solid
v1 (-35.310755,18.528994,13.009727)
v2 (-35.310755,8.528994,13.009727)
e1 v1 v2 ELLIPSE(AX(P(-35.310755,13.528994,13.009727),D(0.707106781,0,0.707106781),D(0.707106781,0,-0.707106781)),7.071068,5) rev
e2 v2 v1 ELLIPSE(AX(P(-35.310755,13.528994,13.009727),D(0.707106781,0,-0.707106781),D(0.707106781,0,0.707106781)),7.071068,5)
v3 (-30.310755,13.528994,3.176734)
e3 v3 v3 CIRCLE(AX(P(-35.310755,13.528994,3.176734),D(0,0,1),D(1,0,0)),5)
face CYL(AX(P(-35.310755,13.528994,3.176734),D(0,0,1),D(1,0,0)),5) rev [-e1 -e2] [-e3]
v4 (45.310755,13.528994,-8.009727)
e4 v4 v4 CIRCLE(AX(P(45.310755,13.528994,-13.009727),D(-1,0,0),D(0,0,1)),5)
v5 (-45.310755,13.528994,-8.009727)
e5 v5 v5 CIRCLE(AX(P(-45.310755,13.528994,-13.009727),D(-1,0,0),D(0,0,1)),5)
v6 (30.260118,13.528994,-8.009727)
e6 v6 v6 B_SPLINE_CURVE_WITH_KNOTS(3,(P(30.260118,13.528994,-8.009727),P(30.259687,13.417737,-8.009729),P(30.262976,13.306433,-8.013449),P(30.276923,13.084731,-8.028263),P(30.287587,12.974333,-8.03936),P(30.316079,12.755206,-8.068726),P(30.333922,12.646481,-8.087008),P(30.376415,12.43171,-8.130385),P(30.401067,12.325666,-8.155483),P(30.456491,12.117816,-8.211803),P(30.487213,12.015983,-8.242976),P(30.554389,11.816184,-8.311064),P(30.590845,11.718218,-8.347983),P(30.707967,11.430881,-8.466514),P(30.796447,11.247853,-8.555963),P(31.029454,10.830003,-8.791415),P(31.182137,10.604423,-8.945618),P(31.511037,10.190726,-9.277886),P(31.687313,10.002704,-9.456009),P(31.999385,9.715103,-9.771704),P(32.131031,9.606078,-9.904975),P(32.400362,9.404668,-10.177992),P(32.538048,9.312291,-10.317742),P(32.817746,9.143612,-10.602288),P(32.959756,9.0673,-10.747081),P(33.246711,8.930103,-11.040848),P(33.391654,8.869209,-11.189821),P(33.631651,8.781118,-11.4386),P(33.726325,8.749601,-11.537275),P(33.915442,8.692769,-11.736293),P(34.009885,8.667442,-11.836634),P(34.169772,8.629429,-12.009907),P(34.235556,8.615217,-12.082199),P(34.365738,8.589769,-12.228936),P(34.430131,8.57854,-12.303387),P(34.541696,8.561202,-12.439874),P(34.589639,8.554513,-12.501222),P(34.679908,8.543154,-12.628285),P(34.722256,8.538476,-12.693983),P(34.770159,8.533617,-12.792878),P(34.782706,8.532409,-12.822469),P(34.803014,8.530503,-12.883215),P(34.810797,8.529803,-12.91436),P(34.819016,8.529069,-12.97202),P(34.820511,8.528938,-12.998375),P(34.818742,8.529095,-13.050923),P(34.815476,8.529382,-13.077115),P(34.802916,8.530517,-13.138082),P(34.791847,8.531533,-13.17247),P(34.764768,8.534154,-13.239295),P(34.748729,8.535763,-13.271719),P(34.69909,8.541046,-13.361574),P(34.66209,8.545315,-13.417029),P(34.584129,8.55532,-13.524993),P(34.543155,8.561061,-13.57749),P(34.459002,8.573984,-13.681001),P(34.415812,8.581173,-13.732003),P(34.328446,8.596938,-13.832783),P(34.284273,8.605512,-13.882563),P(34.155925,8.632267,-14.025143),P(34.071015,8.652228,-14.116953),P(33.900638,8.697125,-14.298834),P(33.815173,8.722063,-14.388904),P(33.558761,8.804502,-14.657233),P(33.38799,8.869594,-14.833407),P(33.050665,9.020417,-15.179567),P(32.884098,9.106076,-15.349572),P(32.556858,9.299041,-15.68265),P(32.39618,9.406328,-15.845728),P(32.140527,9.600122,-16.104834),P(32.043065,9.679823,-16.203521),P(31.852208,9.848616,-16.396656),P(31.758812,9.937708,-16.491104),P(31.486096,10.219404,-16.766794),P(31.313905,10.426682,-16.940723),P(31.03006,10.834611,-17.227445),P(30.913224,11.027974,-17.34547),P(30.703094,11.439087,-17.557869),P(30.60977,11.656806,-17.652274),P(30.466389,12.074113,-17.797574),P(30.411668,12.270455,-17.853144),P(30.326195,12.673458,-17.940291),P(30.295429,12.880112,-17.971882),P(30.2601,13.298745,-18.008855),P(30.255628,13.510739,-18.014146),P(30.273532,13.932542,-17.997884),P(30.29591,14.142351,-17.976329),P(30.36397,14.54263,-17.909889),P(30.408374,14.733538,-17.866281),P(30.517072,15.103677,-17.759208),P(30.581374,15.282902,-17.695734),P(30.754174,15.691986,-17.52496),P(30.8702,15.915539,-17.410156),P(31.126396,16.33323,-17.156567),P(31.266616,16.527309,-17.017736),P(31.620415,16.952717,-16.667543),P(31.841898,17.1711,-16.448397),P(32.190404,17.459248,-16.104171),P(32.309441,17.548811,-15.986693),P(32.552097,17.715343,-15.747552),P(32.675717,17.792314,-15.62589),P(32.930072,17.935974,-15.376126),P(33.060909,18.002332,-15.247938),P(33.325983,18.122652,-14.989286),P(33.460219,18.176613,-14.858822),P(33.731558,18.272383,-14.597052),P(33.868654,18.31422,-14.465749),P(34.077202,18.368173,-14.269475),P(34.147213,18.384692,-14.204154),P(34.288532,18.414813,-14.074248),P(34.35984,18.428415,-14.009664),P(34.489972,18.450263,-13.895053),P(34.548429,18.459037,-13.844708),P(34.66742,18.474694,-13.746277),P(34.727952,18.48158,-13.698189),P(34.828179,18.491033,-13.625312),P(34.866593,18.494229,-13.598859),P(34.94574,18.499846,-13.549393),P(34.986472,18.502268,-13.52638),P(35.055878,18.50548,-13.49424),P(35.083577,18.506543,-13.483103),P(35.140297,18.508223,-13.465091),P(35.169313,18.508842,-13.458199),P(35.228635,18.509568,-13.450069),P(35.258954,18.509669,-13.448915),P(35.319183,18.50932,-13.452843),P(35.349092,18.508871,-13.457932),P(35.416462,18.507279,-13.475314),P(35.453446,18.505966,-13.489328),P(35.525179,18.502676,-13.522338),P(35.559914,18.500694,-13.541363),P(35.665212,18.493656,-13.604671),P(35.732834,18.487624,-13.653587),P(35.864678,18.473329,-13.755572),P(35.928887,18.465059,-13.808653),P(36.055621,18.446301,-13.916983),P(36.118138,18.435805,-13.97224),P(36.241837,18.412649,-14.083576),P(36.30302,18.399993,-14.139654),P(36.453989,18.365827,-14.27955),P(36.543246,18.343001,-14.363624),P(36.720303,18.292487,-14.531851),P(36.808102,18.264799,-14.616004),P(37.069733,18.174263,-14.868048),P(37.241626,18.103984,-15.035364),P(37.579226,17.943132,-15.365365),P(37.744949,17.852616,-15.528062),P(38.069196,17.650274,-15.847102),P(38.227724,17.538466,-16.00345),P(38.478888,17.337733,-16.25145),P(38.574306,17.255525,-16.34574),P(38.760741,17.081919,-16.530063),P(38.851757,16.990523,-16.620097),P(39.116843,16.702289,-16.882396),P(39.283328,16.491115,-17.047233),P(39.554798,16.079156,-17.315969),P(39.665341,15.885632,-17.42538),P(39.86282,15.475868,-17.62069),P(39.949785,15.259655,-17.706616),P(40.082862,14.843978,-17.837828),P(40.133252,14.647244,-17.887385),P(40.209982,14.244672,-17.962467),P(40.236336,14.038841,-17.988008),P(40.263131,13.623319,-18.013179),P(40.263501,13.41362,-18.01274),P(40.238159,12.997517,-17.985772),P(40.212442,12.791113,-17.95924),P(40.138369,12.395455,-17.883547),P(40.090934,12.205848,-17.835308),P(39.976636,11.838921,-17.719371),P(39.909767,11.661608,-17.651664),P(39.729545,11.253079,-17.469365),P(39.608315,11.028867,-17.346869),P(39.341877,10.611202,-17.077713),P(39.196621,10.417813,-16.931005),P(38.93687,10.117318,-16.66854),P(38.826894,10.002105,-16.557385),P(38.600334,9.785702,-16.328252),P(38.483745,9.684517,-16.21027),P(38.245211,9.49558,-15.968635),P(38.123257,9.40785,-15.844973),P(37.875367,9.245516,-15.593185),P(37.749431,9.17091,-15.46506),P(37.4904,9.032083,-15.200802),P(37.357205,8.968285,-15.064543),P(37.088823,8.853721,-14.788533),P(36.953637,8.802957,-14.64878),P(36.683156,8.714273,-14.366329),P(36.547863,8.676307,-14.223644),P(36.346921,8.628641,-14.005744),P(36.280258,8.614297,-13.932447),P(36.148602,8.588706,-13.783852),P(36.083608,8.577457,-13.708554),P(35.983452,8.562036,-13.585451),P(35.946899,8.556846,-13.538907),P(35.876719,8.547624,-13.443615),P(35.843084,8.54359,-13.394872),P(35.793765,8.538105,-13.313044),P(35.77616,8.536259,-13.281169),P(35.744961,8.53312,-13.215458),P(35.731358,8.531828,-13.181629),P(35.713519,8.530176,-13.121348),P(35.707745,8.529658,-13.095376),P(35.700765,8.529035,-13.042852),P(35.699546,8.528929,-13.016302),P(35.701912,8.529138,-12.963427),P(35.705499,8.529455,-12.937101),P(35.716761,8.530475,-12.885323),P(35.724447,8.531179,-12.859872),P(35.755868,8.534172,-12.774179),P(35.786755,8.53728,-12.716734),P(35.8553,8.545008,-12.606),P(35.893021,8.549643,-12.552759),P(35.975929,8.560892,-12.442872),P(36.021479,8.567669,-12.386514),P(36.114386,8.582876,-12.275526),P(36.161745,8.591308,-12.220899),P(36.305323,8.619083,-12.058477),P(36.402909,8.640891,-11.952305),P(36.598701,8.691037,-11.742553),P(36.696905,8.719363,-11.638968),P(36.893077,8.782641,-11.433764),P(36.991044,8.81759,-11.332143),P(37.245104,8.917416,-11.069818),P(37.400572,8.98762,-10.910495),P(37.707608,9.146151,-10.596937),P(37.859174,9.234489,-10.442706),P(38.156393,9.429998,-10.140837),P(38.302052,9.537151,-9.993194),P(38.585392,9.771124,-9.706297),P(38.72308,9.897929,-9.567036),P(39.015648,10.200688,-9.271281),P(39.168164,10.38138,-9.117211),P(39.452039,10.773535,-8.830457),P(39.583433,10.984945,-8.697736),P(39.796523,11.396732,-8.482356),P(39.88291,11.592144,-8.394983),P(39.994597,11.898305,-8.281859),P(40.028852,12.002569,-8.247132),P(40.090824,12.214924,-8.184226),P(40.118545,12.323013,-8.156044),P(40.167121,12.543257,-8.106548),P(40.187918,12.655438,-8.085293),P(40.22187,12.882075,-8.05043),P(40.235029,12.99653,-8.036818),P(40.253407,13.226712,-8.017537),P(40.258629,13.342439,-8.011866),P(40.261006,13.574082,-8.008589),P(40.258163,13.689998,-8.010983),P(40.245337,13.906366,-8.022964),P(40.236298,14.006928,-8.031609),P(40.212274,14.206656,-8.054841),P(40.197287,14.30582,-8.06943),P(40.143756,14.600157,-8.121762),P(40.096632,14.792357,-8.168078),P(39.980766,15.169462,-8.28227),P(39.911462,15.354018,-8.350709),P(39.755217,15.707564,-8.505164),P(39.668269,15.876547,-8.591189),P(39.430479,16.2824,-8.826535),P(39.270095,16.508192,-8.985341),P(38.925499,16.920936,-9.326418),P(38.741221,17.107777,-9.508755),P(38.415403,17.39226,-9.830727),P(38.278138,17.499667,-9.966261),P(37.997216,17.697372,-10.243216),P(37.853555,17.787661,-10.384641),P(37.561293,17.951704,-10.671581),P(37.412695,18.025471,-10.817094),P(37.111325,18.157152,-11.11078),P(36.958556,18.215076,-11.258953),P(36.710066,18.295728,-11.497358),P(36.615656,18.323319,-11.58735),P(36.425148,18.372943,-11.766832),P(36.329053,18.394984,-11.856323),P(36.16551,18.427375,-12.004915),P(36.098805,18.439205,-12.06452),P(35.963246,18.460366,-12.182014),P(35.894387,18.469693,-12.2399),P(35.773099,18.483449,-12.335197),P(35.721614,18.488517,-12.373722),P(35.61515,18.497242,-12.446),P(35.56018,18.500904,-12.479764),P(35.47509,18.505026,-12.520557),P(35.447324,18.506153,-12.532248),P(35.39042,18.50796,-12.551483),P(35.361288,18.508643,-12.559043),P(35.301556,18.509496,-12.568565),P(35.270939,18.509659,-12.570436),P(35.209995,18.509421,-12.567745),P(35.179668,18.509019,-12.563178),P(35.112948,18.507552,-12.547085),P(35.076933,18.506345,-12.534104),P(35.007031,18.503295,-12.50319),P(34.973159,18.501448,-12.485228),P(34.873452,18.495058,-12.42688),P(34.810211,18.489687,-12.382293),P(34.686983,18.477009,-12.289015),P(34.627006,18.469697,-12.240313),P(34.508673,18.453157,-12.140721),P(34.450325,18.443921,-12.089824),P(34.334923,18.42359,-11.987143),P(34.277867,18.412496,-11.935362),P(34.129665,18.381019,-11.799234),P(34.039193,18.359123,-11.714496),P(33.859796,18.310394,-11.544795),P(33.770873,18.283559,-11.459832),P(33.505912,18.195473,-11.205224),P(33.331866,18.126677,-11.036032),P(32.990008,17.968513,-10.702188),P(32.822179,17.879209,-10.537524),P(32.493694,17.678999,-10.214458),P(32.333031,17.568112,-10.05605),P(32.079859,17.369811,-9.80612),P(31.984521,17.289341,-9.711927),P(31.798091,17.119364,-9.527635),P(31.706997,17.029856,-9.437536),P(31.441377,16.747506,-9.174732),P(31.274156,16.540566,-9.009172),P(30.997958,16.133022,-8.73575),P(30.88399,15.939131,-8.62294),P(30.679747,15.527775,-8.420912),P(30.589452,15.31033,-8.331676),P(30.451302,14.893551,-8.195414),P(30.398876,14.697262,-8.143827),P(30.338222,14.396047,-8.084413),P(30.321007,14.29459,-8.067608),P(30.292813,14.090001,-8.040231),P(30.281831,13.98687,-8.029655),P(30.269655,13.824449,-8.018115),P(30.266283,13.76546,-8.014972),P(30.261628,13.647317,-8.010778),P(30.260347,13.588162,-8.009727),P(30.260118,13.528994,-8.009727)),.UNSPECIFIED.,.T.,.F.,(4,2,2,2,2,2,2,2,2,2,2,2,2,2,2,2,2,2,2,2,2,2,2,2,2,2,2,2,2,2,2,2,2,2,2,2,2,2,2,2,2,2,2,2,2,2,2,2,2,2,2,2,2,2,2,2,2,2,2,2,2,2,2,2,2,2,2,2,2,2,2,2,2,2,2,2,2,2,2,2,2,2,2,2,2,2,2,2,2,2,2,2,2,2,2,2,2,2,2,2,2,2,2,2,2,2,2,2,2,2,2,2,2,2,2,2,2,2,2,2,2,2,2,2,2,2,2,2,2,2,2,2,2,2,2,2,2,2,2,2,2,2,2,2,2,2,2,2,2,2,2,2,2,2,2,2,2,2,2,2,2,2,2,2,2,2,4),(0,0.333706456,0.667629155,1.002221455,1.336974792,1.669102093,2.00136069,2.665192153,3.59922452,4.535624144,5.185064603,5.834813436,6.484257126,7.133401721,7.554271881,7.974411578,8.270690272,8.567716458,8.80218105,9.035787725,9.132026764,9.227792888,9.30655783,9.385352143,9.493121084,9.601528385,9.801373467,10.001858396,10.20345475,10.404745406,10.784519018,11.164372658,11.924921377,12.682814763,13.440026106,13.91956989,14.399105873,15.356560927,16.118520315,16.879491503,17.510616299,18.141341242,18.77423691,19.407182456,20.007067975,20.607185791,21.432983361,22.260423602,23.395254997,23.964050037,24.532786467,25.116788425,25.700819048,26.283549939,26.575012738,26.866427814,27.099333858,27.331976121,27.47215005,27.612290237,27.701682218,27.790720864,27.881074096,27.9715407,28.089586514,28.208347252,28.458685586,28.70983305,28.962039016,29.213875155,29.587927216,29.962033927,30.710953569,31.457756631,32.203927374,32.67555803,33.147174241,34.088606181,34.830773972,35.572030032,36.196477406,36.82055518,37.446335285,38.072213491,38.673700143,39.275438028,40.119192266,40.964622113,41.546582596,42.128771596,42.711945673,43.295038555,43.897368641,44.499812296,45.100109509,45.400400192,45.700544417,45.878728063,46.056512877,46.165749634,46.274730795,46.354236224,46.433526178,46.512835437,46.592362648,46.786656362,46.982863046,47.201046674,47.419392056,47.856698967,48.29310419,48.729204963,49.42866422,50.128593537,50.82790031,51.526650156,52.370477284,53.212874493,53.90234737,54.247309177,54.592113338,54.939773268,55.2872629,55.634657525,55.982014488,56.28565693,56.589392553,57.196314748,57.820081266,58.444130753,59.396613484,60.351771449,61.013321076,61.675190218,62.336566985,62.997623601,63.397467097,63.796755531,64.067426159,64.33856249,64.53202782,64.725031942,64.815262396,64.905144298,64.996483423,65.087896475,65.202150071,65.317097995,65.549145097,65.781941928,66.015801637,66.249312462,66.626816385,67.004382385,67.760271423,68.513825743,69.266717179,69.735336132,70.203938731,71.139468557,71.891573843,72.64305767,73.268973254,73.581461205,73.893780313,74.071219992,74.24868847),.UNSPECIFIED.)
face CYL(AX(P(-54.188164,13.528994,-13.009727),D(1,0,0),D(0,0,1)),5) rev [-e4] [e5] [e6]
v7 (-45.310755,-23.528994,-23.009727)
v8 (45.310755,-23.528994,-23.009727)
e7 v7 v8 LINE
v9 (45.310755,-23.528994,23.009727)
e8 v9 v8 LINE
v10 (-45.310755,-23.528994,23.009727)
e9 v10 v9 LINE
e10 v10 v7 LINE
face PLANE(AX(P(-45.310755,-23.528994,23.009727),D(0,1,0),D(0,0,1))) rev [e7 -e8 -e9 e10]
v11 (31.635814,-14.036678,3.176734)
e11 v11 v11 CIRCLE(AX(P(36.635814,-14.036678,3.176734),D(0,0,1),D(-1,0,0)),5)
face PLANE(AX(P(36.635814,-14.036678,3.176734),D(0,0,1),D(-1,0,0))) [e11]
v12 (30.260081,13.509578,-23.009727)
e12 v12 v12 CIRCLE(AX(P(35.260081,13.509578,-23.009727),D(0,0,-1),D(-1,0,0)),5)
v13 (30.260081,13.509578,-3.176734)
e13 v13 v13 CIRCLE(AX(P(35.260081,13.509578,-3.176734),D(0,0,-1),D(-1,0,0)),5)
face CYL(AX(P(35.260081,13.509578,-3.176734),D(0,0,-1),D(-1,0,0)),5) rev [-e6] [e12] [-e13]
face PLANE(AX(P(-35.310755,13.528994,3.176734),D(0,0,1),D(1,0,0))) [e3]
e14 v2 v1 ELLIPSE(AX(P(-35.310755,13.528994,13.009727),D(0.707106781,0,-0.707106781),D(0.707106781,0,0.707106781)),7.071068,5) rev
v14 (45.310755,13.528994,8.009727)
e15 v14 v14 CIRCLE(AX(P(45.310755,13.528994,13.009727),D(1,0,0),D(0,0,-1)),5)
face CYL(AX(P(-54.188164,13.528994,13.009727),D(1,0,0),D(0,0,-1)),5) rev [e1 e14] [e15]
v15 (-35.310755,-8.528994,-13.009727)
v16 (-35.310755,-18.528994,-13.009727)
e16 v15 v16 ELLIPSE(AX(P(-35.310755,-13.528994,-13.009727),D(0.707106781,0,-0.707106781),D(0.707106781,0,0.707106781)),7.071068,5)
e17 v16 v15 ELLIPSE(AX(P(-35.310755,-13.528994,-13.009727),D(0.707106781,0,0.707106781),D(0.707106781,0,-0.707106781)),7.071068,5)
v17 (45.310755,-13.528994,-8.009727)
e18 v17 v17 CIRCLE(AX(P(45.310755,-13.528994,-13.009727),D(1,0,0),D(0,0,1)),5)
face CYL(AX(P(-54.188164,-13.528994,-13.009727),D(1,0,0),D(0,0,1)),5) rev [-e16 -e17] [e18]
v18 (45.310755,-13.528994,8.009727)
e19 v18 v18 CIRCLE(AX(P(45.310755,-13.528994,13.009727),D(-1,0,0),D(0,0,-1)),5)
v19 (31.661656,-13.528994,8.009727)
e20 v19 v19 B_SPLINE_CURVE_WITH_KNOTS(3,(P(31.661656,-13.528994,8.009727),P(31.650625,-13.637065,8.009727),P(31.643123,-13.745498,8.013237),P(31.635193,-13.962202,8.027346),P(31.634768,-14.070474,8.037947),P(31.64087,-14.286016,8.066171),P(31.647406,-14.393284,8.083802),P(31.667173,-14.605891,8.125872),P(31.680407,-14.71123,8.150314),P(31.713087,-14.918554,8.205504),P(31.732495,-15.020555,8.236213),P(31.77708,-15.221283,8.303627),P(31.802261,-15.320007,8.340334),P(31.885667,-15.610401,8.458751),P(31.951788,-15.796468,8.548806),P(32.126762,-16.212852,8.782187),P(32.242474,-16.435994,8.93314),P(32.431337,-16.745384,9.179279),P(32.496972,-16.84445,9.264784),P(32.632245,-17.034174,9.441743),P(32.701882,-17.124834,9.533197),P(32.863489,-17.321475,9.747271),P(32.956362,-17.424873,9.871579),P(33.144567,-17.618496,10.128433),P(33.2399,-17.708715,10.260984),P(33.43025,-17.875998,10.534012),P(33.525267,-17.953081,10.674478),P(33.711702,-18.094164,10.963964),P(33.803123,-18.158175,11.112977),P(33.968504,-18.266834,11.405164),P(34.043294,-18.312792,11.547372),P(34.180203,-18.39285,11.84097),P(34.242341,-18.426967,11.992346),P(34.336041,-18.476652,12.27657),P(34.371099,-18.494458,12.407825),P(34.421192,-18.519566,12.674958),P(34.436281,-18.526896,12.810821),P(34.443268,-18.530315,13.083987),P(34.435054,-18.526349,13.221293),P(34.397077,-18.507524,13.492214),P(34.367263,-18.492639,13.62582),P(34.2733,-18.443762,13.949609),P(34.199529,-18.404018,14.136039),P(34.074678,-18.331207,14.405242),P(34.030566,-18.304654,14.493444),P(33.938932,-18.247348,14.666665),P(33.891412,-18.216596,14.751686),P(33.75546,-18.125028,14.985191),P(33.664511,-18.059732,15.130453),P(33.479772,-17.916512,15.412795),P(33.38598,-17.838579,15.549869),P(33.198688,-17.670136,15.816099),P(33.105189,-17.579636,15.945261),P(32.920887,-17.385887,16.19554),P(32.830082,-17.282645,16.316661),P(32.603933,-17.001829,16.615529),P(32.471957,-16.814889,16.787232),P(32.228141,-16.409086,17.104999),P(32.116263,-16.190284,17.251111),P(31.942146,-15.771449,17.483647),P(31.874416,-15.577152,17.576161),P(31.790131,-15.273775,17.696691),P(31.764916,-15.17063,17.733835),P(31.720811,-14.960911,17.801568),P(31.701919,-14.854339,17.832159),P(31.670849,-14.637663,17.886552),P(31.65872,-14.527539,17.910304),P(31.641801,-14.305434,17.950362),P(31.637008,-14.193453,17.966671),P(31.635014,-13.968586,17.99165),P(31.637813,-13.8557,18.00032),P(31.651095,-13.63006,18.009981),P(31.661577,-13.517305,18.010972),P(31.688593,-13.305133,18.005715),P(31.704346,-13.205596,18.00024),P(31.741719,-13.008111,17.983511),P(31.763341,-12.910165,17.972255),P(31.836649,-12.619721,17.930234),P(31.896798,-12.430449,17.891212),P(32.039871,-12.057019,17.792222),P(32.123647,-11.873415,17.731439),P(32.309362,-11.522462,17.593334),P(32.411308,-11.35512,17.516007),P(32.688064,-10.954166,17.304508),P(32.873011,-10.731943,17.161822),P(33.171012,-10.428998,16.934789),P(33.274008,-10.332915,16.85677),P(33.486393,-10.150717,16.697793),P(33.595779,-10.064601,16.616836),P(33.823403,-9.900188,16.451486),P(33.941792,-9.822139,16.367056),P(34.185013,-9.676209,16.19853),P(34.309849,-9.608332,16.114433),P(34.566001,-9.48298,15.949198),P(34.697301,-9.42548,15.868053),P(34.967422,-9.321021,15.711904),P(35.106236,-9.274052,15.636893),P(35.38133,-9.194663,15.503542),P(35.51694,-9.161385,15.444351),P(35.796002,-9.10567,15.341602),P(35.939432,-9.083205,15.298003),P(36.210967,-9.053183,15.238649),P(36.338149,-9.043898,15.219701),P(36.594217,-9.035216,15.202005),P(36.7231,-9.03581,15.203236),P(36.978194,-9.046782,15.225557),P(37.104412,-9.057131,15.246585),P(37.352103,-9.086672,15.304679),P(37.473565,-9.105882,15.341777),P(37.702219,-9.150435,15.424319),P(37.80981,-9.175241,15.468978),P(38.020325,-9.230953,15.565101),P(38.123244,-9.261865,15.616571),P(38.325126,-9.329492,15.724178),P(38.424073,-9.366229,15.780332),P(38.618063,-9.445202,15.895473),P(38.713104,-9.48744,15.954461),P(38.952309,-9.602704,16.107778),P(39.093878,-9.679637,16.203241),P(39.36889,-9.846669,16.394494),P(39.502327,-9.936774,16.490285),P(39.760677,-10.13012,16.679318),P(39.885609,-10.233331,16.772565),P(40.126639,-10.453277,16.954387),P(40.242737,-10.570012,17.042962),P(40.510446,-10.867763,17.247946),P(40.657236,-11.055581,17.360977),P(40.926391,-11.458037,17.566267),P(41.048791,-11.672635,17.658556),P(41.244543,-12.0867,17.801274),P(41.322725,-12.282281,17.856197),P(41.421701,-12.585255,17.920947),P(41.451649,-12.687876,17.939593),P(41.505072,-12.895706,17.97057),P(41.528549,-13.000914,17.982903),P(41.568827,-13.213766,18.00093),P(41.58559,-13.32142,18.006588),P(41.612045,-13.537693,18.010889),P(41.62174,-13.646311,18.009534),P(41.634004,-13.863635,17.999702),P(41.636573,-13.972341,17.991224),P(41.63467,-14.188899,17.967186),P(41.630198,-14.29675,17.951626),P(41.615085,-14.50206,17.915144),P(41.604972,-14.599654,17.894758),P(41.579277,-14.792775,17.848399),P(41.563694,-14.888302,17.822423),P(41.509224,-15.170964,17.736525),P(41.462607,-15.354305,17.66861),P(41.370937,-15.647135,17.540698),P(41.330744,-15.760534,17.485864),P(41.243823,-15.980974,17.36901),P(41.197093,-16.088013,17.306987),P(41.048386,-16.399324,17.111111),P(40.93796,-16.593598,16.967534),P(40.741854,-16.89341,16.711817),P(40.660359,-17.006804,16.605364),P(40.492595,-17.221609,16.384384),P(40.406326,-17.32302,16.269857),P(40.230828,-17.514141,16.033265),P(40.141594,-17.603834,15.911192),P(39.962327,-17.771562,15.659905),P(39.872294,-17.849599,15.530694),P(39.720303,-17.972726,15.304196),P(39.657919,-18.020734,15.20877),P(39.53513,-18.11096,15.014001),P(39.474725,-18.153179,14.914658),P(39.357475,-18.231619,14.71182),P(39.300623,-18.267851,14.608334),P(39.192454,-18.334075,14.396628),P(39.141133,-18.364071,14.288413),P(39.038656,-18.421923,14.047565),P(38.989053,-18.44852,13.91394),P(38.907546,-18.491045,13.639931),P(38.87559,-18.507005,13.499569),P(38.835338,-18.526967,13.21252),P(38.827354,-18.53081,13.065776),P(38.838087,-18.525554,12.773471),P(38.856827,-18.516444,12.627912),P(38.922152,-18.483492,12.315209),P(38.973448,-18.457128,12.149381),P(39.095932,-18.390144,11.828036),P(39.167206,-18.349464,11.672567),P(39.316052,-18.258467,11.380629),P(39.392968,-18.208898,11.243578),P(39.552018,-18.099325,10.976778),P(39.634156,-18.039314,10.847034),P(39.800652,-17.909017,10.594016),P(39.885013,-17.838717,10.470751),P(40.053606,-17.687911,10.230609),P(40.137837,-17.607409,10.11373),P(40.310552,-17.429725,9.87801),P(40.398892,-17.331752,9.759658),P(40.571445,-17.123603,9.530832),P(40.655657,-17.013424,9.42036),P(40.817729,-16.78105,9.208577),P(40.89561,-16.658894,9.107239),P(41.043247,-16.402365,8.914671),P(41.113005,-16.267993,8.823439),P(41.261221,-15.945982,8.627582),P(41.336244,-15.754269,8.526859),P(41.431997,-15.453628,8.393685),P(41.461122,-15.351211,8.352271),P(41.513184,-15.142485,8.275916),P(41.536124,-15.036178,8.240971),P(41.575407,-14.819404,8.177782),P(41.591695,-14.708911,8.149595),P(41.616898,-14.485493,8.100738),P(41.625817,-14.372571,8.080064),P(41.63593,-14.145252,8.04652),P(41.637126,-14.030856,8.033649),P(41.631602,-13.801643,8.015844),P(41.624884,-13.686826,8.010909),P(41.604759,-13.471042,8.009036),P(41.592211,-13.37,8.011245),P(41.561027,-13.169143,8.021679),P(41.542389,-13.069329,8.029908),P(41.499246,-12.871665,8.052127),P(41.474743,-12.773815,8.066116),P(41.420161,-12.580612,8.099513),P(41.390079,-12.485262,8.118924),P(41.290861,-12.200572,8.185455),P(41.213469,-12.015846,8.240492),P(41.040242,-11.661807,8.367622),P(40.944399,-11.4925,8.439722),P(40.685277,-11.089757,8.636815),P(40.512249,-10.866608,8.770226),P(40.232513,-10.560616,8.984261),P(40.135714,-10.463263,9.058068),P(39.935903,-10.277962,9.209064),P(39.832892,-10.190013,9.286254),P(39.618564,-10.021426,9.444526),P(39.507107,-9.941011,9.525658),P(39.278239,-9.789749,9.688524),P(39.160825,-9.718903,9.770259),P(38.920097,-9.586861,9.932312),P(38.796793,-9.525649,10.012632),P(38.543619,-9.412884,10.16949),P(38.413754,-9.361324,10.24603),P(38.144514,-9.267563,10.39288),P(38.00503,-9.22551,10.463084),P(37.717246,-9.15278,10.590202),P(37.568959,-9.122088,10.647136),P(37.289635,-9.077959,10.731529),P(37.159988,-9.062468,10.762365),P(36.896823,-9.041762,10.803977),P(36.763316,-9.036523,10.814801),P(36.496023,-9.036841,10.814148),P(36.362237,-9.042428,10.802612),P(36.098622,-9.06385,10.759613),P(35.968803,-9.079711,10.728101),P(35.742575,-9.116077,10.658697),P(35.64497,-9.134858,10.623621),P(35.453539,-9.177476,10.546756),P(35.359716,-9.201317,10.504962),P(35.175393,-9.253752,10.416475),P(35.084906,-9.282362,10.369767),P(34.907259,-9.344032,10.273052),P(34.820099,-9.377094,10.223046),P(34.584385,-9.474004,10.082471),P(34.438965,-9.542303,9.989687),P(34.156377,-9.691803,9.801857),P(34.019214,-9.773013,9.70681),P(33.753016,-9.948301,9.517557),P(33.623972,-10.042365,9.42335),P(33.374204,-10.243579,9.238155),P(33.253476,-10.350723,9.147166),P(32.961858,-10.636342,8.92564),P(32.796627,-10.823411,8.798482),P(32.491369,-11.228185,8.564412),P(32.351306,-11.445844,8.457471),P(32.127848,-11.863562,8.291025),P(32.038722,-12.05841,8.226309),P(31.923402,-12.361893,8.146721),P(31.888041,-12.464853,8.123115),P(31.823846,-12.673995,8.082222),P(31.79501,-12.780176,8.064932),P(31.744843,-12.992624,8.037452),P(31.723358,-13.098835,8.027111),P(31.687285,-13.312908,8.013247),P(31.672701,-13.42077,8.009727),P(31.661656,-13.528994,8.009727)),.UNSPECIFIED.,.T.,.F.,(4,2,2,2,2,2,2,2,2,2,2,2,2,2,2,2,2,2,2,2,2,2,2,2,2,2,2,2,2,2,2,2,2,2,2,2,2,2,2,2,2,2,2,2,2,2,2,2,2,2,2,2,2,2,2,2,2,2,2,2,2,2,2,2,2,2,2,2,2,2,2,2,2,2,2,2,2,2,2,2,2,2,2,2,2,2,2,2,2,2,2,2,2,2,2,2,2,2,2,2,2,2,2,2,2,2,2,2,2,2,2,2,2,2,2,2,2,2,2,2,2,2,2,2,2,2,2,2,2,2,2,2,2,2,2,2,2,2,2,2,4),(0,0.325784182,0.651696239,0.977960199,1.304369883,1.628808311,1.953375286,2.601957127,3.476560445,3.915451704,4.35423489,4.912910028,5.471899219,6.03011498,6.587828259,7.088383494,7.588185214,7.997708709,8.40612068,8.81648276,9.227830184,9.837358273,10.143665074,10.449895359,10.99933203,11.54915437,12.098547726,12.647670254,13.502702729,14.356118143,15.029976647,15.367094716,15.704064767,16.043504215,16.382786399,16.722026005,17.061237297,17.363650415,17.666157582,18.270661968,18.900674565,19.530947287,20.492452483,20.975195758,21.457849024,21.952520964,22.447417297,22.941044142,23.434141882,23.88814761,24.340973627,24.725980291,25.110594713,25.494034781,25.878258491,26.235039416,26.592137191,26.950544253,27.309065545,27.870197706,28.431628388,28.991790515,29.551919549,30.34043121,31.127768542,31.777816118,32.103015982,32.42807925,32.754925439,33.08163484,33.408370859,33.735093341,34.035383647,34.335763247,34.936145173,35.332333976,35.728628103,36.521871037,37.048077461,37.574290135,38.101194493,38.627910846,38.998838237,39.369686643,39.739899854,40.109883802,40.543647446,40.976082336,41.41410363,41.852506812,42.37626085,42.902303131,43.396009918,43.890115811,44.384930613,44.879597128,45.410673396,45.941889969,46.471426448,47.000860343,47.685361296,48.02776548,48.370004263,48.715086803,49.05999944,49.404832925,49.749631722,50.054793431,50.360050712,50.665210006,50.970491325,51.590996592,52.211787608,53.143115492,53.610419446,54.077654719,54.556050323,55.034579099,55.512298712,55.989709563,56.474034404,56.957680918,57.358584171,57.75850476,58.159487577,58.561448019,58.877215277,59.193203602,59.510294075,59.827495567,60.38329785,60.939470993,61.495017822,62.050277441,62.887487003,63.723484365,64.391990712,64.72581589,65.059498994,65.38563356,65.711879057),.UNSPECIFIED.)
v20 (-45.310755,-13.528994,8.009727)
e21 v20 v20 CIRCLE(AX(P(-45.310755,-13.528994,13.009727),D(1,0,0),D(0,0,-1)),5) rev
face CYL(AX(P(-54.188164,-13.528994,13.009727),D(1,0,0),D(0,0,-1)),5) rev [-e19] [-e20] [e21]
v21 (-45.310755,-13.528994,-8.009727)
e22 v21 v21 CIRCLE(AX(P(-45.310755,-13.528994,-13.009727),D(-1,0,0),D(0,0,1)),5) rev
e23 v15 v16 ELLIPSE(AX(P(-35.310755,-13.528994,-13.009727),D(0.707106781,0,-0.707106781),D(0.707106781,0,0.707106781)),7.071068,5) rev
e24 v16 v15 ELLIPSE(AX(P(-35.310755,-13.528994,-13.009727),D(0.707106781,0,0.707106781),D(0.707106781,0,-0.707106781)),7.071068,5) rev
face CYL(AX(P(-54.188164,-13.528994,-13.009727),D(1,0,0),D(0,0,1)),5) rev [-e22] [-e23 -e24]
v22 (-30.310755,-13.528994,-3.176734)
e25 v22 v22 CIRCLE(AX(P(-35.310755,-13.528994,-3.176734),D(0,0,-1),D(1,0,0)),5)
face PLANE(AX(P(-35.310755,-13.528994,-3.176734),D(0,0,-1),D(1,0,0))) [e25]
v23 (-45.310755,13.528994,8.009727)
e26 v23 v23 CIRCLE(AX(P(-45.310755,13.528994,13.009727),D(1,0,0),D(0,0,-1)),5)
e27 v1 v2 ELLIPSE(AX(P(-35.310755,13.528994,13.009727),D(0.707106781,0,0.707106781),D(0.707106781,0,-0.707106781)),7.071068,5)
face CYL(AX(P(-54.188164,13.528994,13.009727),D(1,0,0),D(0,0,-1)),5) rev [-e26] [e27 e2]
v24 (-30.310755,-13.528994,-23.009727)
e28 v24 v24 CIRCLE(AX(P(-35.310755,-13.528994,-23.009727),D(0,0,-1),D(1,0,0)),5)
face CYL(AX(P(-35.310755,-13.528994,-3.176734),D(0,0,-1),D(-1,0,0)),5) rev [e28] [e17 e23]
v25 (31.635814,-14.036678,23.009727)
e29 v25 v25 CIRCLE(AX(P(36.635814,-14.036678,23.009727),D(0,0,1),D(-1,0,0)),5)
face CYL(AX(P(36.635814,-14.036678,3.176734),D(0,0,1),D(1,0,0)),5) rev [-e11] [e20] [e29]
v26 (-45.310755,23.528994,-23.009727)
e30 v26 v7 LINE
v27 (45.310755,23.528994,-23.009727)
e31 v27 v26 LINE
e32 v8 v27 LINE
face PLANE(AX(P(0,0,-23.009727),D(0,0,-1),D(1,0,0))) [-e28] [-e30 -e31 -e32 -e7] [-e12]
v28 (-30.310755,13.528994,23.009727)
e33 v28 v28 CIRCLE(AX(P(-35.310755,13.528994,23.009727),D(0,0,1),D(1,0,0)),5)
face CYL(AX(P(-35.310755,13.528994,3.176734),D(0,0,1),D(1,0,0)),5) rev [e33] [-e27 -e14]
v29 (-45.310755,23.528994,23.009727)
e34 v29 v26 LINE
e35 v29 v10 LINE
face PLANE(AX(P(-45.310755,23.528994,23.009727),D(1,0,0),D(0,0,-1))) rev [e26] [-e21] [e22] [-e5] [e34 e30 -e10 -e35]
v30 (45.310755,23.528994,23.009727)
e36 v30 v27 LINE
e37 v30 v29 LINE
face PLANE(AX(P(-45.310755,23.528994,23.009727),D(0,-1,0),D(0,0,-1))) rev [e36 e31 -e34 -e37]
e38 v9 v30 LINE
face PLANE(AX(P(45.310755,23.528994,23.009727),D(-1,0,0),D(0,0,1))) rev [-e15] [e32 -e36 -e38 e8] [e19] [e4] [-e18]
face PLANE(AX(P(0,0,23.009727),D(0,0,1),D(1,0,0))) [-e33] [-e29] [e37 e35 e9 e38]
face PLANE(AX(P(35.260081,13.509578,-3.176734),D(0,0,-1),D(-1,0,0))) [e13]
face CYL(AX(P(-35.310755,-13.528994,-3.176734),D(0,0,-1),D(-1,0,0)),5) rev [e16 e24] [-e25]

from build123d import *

# Parameters (mm, degrees)
SKETCH1_W               = 90.621510256
SKETCH1_H               = 47.057987938
BOSS_EXTRUDE1_DEPTH     = 23.009727366
BOSS_EXTRUDE3_START     = -90.621510256
BOSS_EXTRUDE3_OUTLINE_R = 5
BOSS_EXTRUDE3_DEPTH     = 90.621510256
SKETCH11_R              = 5
CUT_EXTRUDE3_DEPTH      = 19.832993722
CIRPATTERN1_COUNT       = 2
CIRPATTERN2_START       = -23.009727366
CIRPATTERN2_OUTLINE_R   = 5
CIRPATTERN2_DEPTH       = 19.832993722


# Read off the part's stored shape, not the designer's step: Boss-Extrude3, CirPattern2
with BuildPart() as part:
    # Sketch1 → Boss-Extrude1 (new body)
    with BuildSketch(Plane.XY):
        Rectangle(SKETCH1_W, SKETCH1_H)
    extrude(amount=BOSS_EXTRUDE1_DEPTH)

    # Boss-Extrude3 outline → Boss-Extrude3 (cut)
    with BuildSketch(Plane(origin=(45.310755128, 0, 0), x_dir=(0, 0, -1), z_dir=(1, 0, 0)).offset(BOSS_EXTRUDE3_START)):
        with Locations((-13.009727366, 13.528993969)):
            Circle(BOSS_EXTRUDE3_OUTLINE_R)
    boss_extrude3 = extrude(amount=BOSS_EXTRUDE3_DEPTH, mode=Mode.SUBTRACT)

    # Mirror4: Boss-Extrude3 across plane
    add(boss_extrude3.mirror(Plane.ZX), mode=Mode.SUBTRACT)

    # Mirror5: part across plane


with BuildPart() as part_1:
    add(part.part)
    add(part.part.mirror(Plane.XY))

    # Sketch11 → Cut-Extrude3 (cut)
    with BuildSketch(Plane.XY.offset(23.009727366)):
        with Locations((-35.310755128, 13.528993969)):
            Circle(SKETCH11_R)
    cut_extrude3 = extrude(amount=-CUT_EXTRUDE3_DEPTH, mode=Mode.SUBTRACT)

    # CirPattern1: Cut-Extrude3 ×2 about axis
    cirpattern1_axis = Axis((0.662529663, -0.253842201, 0), (0, 0, 1))
    for i in range(1, CIRPATTERN1_COUNT):
        add(cut_extrude3.rotate(cirpattern1_axis, i * 360 / CIRPATTERN1_COUNT), mode=Mode.SUBTRACT)

    # CirPattern2 outline → CirPattern2 (cut)
    with BuildSketch(Plane.XY.offset(CIRPATTERN2_START)):
        with Locations((-35.310755128, -13.528993969)):
            Circle(CIRPATTERN2_OUTLINE_R)
        with Locations((35.260080607, 13.509578489)):
            Circle(CIRPATTERN2_OUTLINE_R)
    extrude(amount=CIRPATTERN2_DEPTH, mode=Mode.SUBTRACT)


solid = part_1.part
